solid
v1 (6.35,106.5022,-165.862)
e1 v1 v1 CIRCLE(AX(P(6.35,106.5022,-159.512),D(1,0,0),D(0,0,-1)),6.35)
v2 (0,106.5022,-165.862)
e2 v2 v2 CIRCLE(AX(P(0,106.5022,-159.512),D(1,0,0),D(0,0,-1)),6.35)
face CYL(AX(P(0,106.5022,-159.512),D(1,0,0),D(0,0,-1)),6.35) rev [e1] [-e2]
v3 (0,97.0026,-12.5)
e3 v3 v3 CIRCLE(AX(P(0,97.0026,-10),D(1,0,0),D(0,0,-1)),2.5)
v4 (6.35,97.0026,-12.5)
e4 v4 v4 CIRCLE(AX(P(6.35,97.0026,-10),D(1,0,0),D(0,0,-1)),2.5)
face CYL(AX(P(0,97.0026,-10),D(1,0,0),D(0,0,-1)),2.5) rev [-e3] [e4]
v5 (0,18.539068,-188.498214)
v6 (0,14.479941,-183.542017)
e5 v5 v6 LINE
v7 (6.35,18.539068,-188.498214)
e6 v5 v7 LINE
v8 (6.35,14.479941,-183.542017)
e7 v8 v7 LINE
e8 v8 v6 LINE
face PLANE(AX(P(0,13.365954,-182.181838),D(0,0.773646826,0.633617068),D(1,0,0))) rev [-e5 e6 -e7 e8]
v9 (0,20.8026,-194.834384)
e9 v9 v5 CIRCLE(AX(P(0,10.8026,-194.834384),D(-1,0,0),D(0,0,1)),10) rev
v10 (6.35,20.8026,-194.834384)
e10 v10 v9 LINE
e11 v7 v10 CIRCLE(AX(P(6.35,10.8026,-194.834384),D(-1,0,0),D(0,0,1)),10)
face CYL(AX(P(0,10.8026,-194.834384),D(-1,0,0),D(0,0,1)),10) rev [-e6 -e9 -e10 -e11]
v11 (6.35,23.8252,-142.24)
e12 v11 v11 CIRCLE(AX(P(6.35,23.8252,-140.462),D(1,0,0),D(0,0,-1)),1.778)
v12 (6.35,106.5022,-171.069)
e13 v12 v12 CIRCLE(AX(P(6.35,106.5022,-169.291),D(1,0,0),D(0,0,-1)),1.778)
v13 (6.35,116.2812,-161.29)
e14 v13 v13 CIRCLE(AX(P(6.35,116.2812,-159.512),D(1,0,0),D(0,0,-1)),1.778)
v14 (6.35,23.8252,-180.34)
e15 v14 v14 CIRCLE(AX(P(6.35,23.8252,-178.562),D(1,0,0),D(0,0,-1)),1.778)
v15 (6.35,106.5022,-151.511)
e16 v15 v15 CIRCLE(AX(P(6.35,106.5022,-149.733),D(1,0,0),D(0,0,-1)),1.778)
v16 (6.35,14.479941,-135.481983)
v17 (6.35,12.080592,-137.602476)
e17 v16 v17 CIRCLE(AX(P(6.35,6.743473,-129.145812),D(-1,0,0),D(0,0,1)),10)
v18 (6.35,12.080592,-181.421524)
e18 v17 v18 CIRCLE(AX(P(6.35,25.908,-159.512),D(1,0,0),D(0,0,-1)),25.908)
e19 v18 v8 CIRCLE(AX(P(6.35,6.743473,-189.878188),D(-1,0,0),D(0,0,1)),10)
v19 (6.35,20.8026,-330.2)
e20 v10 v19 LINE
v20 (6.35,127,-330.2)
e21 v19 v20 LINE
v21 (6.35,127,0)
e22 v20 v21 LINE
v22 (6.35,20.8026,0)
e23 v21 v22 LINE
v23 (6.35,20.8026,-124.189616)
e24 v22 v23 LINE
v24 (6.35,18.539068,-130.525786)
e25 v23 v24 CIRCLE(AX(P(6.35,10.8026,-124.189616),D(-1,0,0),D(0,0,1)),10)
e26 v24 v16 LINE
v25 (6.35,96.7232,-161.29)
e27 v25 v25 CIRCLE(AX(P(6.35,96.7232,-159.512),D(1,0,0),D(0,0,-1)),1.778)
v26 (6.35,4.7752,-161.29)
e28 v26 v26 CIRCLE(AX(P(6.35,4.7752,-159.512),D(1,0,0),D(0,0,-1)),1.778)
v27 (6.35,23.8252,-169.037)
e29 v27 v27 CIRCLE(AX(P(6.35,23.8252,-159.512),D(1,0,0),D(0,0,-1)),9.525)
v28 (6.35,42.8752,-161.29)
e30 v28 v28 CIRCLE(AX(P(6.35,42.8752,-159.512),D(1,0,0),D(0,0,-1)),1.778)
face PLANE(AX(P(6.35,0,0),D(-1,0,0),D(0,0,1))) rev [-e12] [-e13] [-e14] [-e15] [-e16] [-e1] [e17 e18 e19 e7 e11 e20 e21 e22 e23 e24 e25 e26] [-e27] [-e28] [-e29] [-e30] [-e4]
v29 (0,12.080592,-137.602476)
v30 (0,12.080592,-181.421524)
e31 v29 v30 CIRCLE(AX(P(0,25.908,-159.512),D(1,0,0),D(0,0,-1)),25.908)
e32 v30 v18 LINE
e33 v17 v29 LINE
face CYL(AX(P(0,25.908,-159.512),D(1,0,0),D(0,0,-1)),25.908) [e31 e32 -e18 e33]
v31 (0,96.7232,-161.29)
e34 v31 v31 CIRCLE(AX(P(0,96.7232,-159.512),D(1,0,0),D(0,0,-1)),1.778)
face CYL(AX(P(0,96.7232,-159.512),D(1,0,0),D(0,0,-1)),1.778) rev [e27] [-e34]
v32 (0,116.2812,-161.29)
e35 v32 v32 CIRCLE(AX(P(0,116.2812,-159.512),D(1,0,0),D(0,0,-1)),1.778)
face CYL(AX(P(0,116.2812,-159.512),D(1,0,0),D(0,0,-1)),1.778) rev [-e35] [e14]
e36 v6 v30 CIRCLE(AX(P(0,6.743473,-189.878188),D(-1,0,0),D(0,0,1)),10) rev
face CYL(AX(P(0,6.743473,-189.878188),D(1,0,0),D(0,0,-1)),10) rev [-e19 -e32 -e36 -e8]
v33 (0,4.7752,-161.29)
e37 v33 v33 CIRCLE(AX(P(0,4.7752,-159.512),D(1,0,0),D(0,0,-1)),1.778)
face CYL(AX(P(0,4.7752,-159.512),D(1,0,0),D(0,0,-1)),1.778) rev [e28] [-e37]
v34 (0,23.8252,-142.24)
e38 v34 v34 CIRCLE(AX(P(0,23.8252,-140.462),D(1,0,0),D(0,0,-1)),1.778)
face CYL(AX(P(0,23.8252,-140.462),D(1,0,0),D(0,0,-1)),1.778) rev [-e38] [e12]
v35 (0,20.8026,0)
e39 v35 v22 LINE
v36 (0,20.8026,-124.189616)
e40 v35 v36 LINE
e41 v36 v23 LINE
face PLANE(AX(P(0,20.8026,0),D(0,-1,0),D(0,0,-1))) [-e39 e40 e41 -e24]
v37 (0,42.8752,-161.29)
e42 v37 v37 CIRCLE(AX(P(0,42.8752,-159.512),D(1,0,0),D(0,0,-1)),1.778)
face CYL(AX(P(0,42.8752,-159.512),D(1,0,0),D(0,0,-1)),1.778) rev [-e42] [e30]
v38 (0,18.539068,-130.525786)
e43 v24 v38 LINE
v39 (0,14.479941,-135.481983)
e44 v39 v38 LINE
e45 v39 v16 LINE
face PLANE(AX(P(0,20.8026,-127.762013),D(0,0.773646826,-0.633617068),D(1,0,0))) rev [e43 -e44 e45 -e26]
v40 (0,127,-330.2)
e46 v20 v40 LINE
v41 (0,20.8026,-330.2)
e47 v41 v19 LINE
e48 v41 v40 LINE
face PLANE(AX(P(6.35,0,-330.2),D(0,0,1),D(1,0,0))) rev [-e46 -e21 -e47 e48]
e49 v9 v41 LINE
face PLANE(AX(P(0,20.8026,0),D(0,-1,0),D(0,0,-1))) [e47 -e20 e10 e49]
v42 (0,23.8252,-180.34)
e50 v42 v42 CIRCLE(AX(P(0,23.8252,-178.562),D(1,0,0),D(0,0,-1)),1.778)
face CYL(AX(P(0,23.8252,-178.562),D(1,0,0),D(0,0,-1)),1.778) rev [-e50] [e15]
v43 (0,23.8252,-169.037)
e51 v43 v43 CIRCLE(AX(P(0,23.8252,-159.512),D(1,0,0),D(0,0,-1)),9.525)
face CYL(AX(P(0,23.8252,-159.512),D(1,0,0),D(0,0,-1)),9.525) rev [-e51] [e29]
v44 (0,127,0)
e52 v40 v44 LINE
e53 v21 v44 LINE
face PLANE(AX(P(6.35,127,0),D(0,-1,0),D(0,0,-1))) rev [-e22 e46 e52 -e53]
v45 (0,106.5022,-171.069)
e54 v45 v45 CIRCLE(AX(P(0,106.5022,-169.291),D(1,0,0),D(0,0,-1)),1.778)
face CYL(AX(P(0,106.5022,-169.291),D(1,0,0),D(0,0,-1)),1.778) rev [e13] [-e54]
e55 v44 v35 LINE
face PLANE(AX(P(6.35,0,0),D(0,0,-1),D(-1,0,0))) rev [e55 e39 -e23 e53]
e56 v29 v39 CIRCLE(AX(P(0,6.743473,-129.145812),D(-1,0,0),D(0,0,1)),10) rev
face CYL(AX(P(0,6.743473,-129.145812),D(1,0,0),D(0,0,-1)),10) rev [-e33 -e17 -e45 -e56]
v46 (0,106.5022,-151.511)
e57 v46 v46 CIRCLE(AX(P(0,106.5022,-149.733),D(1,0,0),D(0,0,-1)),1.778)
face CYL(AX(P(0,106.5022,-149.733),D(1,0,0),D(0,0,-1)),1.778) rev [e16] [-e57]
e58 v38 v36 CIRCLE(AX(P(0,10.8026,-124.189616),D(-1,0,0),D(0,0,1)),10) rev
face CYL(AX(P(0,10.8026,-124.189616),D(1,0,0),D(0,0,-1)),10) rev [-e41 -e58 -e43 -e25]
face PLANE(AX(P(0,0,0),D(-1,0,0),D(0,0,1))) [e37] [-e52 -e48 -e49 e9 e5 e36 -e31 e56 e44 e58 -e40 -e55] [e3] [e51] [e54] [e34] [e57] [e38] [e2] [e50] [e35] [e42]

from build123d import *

# Parameters (mm, degrees)
SKETCH1_W                                     = 330.2
SKETCH1_H                                     = 127
MAIN_PLATE_SIZE_DEPTH                         = 6.35
SKETCH2_R                                     = 9.525
SKETCH2_R_2                                   = 1.778
BOTTOM_SHAFT_MOUNTING_HOLES_DEPTH             = 354.83804558
SKETCH3_R                                     = 6.35
SKETCH3_R_2                                   = 1.778
TOP_BATTERY_BOX_MOUNTING_HOLES_DEPTH          = 354.83804558
THIS_IS_TO_MATCH_THE_IDIOTIC_DESIGN_OF_B_SIZE = 6.35
THIS_IS_TO_MATCH_THE_IDIOTIC_DESIGN_2_R       = 10
SKETCH4_R                                     = 2.5
F_20MM_EXTRUSION_MOUNT_DEPTH                  = 354.83804558


with BuildPart() as part:
    # Sketch1 → Main Plate Size (new body)
    with BuildSketch(Plane(origin=(0, 0, 0), x_dir=(0, 0, -1), z_dir=(1, 0, 0))):
        with Locations((165.1, 63.5)):
            Rectangle(SKETCH1_W, SKETCH1_H)
    extrude(amount=MAIN_PLATE_SIZE_DEPTH)

    # Sketch2 → Bottom Shaft Mounting Holes (cut, through all)
    with BuildSketch(Plane(origin=(6.35, 0, 0), x_dir=(0, 0, -1), z_dir=(1, 0, 0))):
        with BuildLine():
            Line((134.1120127, 20.8026), (0, 20.8026))
            Line((0, 20.8026), (0, 0))
            Line((0, 0), (159.512000023, 0))
            ThreePointArc((159.512000023, 0), (143.096249024, 5.864358018), (134.1120127, 20.8026))
        make_face()
        with BuildLine():
            ThreePointArc((184.9119873, 20.8026), (175.927750994, 5.864358033), (159.512000023, 0))
            Line((159.512000023, 0), (177.8, 0))
            Line((177.8, 0), (330.2, 0))
            Line((330.2, 0), (330.2, 20.8026))
            Line((330.2, 20.8026), (184.9119873, 20.8026))
        make_face()
        with Locations((159.512, 23.8252)):
            Circle(SKETCH2_R)
        with Locations((159.512, 4.7752)):
            Circle(SKETCH2_R_2)
        with Locations((178.562, 23.8252)):
            Circle(SKETCH2_R_2)
        with Locations((159.512, 42.8752)):
            Circle(SKETCH2_R_2)
        with Locations((140.462, 23.8252)):
            Circle(SKETCH2_R_2)
    extrude(amount=-BOTTOM_SHAFT_MOUNTING_HOLES_DEPTH, mode=Mode.SUBTRACT)

    # Sketch3 → Top Battery Box Mounting Holes (cut, through all)
    with BuildSketch(Plane(origin=(6.35, 0, 0), x_dir=(0, 0, -1), z_dir=(1, 0, 0))):
        with Locations((159.512, 106.5022)):
            Circle(SKETCH3_R)
        with Locations((149.733, 106.5022)):
            Circle(SKETCH3_R_2)
        with Locations((159.512, 116.2812)):
            Circle(SKETCH3_R_2)
        with Locations((169.291, 106.5022)):
            Circle(SKETCH3_R_2)
        with Locations((159.512, 96.7232)):
            Circle(SKETCH3_R_2)
    extrude(amount=-TOP_BATTERY_BOX_MOUNTING_HOLES_DEPTH, mode=Mode.SUBTRACT)

    # This is to match the idiotic Design of B
    # the kernel refuses this chamfer: 6.35 mm, written as the material it adds along each edge
    with BuildSketch(Plane(origin=(6.35, 20.8026, -134.1120127), x_dir=(0, -0.9387383646661532, -0.34463064678568023), z_dir=(-1, 0, 0))) as this_is_to_match_the_idiotic_design_of_b_piece_1:
        with BuildLine():
            Line((7.921958409, 0), (-THIS_IS_TO_MATCH_THE_IDIOTIC_DESIGN_OF_B_SIZE * 0.344630646786, THIS_IS_TO_MATCH_THE_IDIOTIC_DESIGN_OF_B_SIZE * 0.938738364666))
            Line((-THIS_IS_TO_MATCH_THE_IDIOTIC_DESIGN_OF_B_SIZE * 0.344630646786, THIS_IS_TO_MATCH_THE_IDIOTIC_DESIGN_OF_B_SIZE * 0.938738364666), (0, 0))
            ThreePointArc((0, 0), (4.071959946, 0.304342453), (7.921958409, 0))
        make_face()
    extrude(amount=6.35)
    with BuildSketch(Plane(origin=(6.35, 20.8026, -184.9119873), x_dir=(0, -0.9387383646661542, 0.34463064678567756), z_dir=(-1, 0, 0))) as this_is_to_match_the_idiotic_design_of_b_piece_2:
        with BuildLine():
            Line((7.921958409, 0), (-THIS_IS_TO_MATCH_THE_IDIOTIC_DESIGN_OF_B_SIZE * 0.344630646786, -THIS_IS_TO_MATCH_THE_IDIOTIC_DESIGN_OF_B_SIZE * 0.938738364666))
            Line((-THIS_IS_TO_MATCH_THE_IDIOTIC_DESIGN_OF_B_SIZE * 0.344630646786, -THIS_IS_TO_MATCH_THE_IDIOTIC_DESIGN_OF_B_SIZE * 0.938738364666), (0, 0))
            ThreePointArc((0, 0), (4.071959946, -0.304342453), (7.921958409, 0))
        make_face()
    extrude(amount=6.35)

    # This is to match the idiotic Design  2
    this_is_to_match_the_idiotic_design_2_edges = [part.edges().sort_by_distance(p)[0] for p in [
        (3.175, 13.365953718, -136.84216235),
        (3.175, 13.365953718, -182.18183765),
        (3.175, 20.8026, -191.2619873),
        (3.175, 20.8026, -127.7620127),
    ]]
    fillet(this_is_to_match_the_idiotic_design_2_edges, radius=THIS_IS_TO_MATCH_THE_IDIOTIC_DESIGN_2_R)

    # Sketch4 → 20mm Extrusion Mount (cut, through all)
    with BuildSketch(Plane(origin=(6.35, 0, 0), x_dir=(0, 0, -1), z_dir=(1, 0, 0))):
        with Locations((10, 97.0026)):
            Circle(SKETCH4_R)
    extrude(amount=-F_20MM_EXTRUSION_MOUNT_DEPTH, mode=Mode.SUBTRACT)


solid = part.part
